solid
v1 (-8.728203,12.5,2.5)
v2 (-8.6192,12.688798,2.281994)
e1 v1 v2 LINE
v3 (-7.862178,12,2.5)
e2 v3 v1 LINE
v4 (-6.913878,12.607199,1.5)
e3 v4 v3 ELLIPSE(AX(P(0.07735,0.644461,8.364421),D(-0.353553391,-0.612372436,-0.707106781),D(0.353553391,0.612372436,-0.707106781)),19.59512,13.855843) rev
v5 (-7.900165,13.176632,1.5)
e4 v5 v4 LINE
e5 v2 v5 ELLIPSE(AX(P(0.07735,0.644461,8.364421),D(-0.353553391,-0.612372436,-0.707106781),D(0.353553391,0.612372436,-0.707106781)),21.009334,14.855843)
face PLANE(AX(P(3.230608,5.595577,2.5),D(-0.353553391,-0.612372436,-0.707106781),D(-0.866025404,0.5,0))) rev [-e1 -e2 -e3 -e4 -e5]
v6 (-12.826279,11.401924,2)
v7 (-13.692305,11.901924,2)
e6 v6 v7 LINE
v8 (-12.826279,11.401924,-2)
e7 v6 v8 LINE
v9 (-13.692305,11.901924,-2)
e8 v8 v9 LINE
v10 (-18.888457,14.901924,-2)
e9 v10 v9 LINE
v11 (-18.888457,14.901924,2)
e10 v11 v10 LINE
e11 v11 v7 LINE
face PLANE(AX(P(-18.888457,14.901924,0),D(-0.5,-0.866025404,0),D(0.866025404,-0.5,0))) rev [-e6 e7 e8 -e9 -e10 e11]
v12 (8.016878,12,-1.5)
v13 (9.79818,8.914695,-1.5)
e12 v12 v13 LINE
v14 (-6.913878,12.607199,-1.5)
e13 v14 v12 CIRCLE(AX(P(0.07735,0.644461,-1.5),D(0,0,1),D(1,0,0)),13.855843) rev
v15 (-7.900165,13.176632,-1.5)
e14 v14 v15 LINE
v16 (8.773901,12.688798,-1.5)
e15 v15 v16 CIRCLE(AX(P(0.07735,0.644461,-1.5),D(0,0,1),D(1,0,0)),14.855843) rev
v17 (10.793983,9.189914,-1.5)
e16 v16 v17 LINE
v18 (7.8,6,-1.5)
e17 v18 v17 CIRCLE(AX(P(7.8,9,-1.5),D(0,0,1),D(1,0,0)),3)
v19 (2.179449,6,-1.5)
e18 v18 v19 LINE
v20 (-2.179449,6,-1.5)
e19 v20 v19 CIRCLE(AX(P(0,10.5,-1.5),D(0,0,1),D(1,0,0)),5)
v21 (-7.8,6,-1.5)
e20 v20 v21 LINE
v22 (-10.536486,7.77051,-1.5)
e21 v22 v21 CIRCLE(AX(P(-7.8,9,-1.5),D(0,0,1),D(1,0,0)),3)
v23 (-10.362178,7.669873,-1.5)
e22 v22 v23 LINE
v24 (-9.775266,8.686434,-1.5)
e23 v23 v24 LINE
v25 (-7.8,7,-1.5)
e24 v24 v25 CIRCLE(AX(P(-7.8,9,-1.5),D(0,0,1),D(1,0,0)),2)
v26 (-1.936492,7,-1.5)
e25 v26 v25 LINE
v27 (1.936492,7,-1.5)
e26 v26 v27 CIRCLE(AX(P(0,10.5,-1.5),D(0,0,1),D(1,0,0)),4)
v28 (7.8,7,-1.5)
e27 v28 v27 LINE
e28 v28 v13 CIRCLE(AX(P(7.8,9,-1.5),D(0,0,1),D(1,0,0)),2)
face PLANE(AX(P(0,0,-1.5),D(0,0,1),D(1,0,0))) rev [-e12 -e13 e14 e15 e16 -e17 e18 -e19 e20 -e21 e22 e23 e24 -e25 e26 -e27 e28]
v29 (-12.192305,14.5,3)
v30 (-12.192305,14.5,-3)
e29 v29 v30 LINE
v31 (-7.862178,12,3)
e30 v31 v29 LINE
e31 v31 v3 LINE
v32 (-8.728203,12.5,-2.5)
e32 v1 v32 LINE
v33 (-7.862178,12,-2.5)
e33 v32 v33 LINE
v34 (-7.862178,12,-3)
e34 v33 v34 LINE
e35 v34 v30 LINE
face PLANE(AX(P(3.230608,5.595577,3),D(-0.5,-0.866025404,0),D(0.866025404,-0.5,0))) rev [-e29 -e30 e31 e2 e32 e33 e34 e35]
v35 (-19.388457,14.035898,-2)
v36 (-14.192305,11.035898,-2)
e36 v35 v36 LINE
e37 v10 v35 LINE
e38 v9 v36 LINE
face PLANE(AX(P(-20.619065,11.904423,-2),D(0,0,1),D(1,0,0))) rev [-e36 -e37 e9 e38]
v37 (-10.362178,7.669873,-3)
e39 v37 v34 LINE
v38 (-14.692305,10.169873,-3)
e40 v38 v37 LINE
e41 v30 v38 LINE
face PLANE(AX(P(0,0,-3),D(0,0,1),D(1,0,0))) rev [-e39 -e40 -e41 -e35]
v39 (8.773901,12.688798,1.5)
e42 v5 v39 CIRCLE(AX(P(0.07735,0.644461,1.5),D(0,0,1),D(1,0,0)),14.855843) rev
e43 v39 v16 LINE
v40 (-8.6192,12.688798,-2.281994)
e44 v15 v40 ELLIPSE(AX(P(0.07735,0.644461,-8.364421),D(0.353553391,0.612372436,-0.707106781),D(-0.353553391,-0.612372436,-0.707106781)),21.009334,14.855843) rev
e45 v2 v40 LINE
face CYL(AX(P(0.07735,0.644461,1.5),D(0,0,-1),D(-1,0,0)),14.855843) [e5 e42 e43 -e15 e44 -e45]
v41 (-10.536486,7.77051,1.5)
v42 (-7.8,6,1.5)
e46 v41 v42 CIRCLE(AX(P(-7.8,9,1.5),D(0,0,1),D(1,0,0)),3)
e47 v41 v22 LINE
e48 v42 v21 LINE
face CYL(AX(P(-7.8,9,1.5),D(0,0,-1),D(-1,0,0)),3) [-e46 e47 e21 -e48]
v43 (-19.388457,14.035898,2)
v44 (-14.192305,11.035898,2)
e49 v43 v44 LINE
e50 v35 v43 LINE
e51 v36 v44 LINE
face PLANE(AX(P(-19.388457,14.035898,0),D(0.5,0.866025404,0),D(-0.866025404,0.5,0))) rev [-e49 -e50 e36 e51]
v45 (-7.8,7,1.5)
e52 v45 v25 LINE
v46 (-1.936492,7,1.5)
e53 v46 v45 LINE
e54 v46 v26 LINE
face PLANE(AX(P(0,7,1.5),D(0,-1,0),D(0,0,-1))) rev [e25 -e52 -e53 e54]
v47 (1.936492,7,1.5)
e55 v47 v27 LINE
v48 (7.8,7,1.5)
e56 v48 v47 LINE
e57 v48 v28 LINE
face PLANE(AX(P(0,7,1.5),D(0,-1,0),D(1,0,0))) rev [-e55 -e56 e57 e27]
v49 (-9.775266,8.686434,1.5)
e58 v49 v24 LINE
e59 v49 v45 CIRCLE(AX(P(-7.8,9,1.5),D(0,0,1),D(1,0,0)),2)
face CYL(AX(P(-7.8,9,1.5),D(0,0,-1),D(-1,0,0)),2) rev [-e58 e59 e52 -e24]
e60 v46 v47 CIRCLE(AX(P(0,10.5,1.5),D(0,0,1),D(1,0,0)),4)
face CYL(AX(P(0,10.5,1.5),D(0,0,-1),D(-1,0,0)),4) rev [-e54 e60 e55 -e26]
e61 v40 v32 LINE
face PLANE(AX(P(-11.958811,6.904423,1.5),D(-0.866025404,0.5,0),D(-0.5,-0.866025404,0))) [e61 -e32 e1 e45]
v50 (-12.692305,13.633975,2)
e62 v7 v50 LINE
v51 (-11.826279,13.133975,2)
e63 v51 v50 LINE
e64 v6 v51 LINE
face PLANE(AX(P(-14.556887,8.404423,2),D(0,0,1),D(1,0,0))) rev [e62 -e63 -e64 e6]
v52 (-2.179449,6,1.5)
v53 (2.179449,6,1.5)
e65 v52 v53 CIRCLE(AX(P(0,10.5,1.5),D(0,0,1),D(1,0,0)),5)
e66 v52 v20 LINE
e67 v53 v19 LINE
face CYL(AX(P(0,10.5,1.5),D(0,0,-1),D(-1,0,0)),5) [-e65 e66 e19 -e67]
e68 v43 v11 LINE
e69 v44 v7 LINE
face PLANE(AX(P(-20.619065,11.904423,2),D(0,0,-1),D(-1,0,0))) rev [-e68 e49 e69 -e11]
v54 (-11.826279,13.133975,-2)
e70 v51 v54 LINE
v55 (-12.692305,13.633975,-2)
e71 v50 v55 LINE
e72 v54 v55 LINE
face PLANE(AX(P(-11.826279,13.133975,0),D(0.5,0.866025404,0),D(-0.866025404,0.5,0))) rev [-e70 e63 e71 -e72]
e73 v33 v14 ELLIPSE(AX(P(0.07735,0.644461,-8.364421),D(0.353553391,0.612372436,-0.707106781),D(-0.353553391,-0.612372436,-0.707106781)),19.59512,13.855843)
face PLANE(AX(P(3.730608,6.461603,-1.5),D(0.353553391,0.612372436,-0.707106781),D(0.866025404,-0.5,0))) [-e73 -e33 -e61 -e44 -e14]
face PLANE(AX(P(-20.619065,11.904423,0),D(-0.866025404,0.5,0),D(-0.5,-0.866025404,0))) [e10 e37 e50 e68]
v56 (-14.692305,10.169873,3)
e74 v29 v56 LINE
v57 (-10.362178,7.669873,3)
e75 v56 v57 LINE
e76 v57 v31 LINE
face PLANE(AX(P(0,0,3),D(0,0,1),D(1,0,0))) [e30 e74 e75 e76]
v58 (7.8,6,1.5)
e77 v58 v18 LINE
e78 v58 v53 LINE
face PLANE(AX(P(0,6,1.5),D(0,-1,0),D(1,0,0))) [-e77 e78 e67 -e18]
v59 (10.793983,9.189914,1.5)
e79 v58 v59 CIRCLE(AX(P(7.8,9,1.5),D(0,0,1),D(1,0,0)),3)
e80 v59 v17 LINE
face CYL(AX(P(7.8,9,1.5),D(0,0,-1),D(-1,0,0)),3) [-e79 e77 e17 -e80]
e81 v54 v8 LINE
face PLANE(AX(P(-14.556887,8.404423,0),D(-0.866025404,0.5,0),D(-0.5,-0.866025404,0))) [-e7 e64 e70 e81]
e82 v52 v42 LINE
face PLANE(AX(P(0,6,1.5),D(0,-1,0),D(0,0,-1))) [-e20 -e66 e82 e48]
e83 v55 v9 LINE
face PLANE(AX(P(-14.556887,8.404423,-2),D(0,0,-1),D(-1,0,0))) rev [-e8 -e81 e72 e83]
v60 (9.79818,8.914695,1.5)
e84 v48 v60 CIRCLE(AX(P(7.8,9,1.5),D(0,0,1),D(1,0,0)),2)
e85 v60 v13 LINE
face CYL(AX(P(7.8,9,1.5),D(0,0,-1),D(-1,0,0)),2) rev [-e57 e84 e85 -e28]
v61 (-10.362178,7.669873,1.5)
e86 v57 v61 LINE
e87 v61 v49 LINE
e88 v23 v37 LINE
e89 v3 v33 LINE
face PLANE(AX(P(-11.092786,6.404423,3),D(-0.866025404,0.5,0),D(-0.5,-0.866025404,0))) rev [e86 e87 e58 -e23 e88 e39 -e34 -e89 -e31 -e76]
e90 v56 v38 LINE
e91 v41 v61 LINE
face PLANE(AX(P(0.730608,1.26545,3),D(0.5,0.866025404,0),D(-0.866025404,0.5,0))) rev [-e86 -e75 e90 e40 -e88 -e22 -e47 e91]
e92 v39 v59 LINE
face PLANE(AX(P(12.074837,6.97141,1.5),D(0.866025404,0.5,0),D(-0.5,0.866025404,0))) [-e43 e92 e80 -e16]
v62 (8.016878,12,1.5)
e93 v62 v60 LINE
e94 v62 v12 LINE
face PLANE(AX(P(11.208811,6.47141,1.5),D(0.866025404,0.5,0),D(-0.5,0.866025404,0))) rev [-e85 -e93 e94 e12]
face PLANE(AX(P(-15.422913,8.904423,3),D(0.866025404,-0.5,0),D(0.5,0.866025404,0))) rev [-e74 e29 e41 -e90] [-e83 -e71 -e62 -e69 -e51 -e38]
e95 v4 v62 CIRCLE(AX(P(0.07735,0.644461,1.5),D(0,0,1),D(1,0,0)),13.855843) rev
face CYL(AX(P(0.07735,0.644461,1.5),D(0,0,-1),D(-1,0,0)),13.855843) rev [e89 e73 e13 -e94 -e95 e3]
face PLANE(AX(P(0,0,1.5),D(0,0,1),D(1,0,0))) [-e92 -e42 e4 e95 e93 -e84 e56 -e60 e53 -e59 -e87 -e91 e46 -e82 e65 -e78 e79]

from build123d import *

# Parameters (mm, degrees)
BOSS_EXTRUDE2_DEPTH = 1.5
BOSS_EXTRUDE3_DEPTH = 3
SKETCH2_W           = 4
SKETCH2_H           = 1
BOSS_EXTRUDE4_DEPTH = 6
SKETCH2_3_W         = 4
SKETCH2_3_H         = 2
CUT_EXTRUDE1_DEPTH  = 1
CHAMFER1_SIZE       = 1


with BuildPart() as part:
    # Sketch1 → Boss-Extrude2 (new, symmetric)
    with BuildSketch(Plane.XY):
        with BuildLine():
            Line((-7.8, 6), (-2.179449472, 6))
            ThreePointArc((-2.179449472, 6), (0, 5.5), (2.179449472, 6))
            Line((2.179449472, 6), (7.8, 6))
            ThreePointArc((7.8, 6), (9.987434844, 6.946922115), (10.793982736, 9.189914132))
            Line((10.793982736, 9.189914132), (8.773900958, 12.688798406))
            ThreePointArc((8.773900958, 12.688798406), (0.077350269, 15.500303533), (-8.61920042, 12.688798406))
            Line((-8.61920042, 12.688798406), (-8.72820323, 12.5))
            Line((-8.72820323, 12.5), (-7.862177826, 12))
            ThreePointArc((-7.862177826, 12), (0.077350269, 14.500303533), (8.016878365, 12))
            Line((8.016878365, 12), (9.798179943, 8.914695163))
            ThreePointArc((9.798179943, 8.914695163), (9.183725104, 7.55594154), (7.8, 7))
            Line((7.8, 7), (1.936491673, 7))
            ThreePointArc((1.936491673, 7), (0, 6.5), (-1.936491673, 7))
            Line((-1.936491673, 7), (-7.8, 7))
            ThreePointArc((-7.8, 7), (-9.098627684, 7.478958864), (-9.775266128, 8.686433862))
            Line((-9.775266128, 8.686433862), (-10.362177826, 7.669872981))
            Line((-10.362177826, 7.669872981), (-10.536485592, 7.770509617))
            ThreePointArc((-10.536485592, 7.770509617), (-9.429651627, 6.481223397), (-7.8, 6))
        make_face()
    extrude(amount=BOSS_EXTRUDE2_DEPTH, both=True)

    # Sketch1<5> → Boss-Extrude3 (add, symmetric)
    with BuildSketch(Plane.XY):
        with BuildLine():
            Line((-14.692304845, 10.169872981), (-10.536485592, 7.770509617))
            ThreePointArc((-10.536485592, 7.770509617), (-10.724033666, 8.329159391), (-10.798758273, 8.913693465))
            Line((-10.798758273, 8.913693465), (-8.72820323, 12.5))
            Line((-8.72820323, 12.5), (-12.192304845, 14.5))
            Line((-12.192304845, 14.5), (-14.692304845, 10.169872981))
        make_face()
        with BuildLine():
            ThreePointArc((-10.798758273, 8.913693465), (-10.724033666, 8.329159391), (-10.536485592, 7.770509617))
            Line((-10.536485592, 7.770509617), (-10.362177826, 7.669872981))
            Line((-10.362177826, 7.669872981), (-9.775266128, 8.686433862))
            Line((-9.775266128, 8.686433862), (-7.862177826, 12))
            Line((-7.862177826, 12), (-8.72820323, 12.5))
            Line((-8.72820323, 12.5), (-10.798758273, 8.913693465))
        make_face()
    extrude(amount=BOSS_EXTRUDE3_DEPTH, both=True)

    # Sketch2 → Boss-Extrude4 (add)
    with BuildSketch(Plane(origin=(-15.422912811, 8.904422863, 0), x_dir=(0, 0, 1), z_dir=(-0.8660254037844408, 0.4999999999999963, 0))):
        with Locations((0, 2.961215932)):
            Rectangle(SKETCH2_W, SKETCH2_H)
    extrude(amount=BOSS_EXTRUDE4_DEPTH)

    # Sketch2<3> → Cut-Extrude1 (cut)
    with BuildSketch(Plane(origin=(-15.422912811, 8.904422863, 0), x_dir=(0, 0, 1), z_dir=(-0.8660254037844408, 0.4999999999999963, 0))):
        with Locations((0, 4.461215932)):
            Rectangle(SKETCH2_3_W, SKETCH2_3_H)
    extrude(amount=-CUT_EXTRUDE1_DEPTH, mode=Mode.SUBTRACT)

    # Chamfer1
    # the kernel refuses this chamfer: 1 mm, written as the material it adds along each edge
    with BuildSketch(Plane(origin=(-8.72820323, 12.5, -1.5), x_dir=(0.4998109584556448, 0.8656979742248824, 0.027495876610586233), z_dir=(0.8660254037844407, -0.4999999999999965, 0))) as chamfer1_piece_1_section:
        Polygon((CHAMFER1_SIZE * 0.999621916911, -CHAMFER1_SIZE * 0.0274958766106), (-CHAMFER1_SIZE * 0.0274958766106, -CHAMFER1_SIZE * 0.999621916911), (0, 0), align=None)
    chamfer1_piece_1 = extrude(amount=1, mode=Mode.PRIVATE)
    chamfer1_piece_1 = chamfer1_piece_1 & Plane(origin=(0.077350269, 0.64446099, -1.842899674), x_dir=(0.5853959924126673, 0.8107475143762012, 0), z_dir=(0, 0, 1)) * Cylinder(14.855842544, 6, mode=Mode.PRIVATE)
    chamfer1_piece_1 = chamfer1_piece_1 - Plane(origin=(0.077350269, 0.64446099, -1.842899674), x_dir=(-0.5730094052913434, 0.8195487913770974, 0), z_dir=(0, 0, 1)) * Cylinder(13.855842544, 6, mode=Mode.PRIVATE)
    add(chamfer1_piece_1)
    with BuildSketch(Plane(origin=(-8.72820323, 12.5, -1.5), x_dir=(0.4998109584556448, 0.8656979742248824, 0.027495876610586233), z_dir=(0.8660254037844407, -0.4999999999999965, 0))) as chamfer1_piece_2_section:
        Polygon((CHAMFER1_SIZE * 0.999621916911, -CHAMFER1_SIZE * 0.0274958766106), (-CHAMFER1_SIZE * 0.0274958766106, -CHAMFER1_SIZE * 0.999621916911), (0, 0), align=None)
    chamfer1_piece_2 = extrude(amount=3.571682988, mode=Mode.PRIVATE)
    chamfer1_piece_2 = split(chamfer1_piece_2, bisect_by=Plane(origin=(-7.598721959, 12.456318948, -1.72489745), z_dir=(0.8660254037844384, -0.5000000000000004, 0)), keep=Keep.TOP, mode=Mode.PRIVATE)
    chamfer1_piece_2 = chamfer1_piece_2 - Plane(origin=(0.077350269, 0.64446099, -1.72489745), x_dir=(-0.5730094052913434, 0.8195487913770974, 0), z_dir=(0, 0, 1)) * Cylinder(13.855842544, 12, mode=Mode.PRIVATE)
    add(chamfer1_piece_2)
    with BuildSketch(Plane(origin=(-8.72820323, 12.5, 1.5), x_dir=(0.4998109584556448, 0.8656979742248824, -0.027495876610586233), z_dir=(0.8660254037844407, -0.4999999999999965, 0))) as chamfer1_piece_3_section:
        Polygon((CHAMFER1_SIZE * 0.999621916911, CHAMFER1_SIZE * 0.0274958766106), (-CHAMFER1_SIZE * 0.0274958766106, CHAMFER1_SIZE * 0.999621916911), (0, 0), align=None)
    chamfer1_piece_3 = extrude(amount=1, mode=Mode.PRIVATE)
    chamfer1_piece_3 = chamfer1_piece_3 & Plane(origin=(0.077350269, 0.64446099, 1.842899674), x_dir=(0.5853959924126673, 0.8107475143762012, 0), z_dir=(0, 0, 1)) * Cylinder(14.855842544, 6, mode=Mode.PRIVATE)
    chamfer1_piece_3 = chamfer1_piece_3 - Plane(origin=(0.077350269, 0.64446099, 1.842899674), x_dir=(-0.5730094052913434, 0.8195487913770974, 0), z_dir=(0, 0, 1)) * Cylinder(13.855842544, 6, mode=Mode.PRIVATE)
    add(chamfer1_piece_3)
    with BuildSketch(Plane(origin=(-8.72820323, 12.5, 1.5), x_dir=(0.4998109584556448, 0.8656979742248824, -0.027495876610586233), z_dir=(0.8660254037844407, -0.4999999999999965, 0))) as chamfer1_piece_4_section:
        Polygon((CHAMFER1_SIZE * 0.999621916911, CHAMFER1_SIZE * 0.0274958766106), (-CHAMFER1_SIZE * 0.0274958766106, CHAMFER1_SIZE * 0.999621916911), (0, 0), align=None)
    chamfer1_piece_4 = extrude(amount=3.571682988, mode=Mode.PRIVATE)
    chamfer1_piece_4 = split(chamfer1_piece_4, bisect_by=Plane(origin=(-7.598721959, 12.456318948, 1.72489745), z_dir=(0.8660254037844384, -0.5000000000000004, 0)), keep=Keep.TOP, mode=Mode.PRIVATE)
    chamfer1_piece_4 = chamfer1_piece_4 - Plane(origin=(0.077350269, 0.64446099, 1.72489745), x_dir=(-0.5730094052913434, 0.8195487913770974, 0), z_dir=(0, 0, 1)) * Cylinder(13.855842544, 12, mode=Mode.PRIVATE)
    add(chamfer1_piece_4)


solid = part.part
